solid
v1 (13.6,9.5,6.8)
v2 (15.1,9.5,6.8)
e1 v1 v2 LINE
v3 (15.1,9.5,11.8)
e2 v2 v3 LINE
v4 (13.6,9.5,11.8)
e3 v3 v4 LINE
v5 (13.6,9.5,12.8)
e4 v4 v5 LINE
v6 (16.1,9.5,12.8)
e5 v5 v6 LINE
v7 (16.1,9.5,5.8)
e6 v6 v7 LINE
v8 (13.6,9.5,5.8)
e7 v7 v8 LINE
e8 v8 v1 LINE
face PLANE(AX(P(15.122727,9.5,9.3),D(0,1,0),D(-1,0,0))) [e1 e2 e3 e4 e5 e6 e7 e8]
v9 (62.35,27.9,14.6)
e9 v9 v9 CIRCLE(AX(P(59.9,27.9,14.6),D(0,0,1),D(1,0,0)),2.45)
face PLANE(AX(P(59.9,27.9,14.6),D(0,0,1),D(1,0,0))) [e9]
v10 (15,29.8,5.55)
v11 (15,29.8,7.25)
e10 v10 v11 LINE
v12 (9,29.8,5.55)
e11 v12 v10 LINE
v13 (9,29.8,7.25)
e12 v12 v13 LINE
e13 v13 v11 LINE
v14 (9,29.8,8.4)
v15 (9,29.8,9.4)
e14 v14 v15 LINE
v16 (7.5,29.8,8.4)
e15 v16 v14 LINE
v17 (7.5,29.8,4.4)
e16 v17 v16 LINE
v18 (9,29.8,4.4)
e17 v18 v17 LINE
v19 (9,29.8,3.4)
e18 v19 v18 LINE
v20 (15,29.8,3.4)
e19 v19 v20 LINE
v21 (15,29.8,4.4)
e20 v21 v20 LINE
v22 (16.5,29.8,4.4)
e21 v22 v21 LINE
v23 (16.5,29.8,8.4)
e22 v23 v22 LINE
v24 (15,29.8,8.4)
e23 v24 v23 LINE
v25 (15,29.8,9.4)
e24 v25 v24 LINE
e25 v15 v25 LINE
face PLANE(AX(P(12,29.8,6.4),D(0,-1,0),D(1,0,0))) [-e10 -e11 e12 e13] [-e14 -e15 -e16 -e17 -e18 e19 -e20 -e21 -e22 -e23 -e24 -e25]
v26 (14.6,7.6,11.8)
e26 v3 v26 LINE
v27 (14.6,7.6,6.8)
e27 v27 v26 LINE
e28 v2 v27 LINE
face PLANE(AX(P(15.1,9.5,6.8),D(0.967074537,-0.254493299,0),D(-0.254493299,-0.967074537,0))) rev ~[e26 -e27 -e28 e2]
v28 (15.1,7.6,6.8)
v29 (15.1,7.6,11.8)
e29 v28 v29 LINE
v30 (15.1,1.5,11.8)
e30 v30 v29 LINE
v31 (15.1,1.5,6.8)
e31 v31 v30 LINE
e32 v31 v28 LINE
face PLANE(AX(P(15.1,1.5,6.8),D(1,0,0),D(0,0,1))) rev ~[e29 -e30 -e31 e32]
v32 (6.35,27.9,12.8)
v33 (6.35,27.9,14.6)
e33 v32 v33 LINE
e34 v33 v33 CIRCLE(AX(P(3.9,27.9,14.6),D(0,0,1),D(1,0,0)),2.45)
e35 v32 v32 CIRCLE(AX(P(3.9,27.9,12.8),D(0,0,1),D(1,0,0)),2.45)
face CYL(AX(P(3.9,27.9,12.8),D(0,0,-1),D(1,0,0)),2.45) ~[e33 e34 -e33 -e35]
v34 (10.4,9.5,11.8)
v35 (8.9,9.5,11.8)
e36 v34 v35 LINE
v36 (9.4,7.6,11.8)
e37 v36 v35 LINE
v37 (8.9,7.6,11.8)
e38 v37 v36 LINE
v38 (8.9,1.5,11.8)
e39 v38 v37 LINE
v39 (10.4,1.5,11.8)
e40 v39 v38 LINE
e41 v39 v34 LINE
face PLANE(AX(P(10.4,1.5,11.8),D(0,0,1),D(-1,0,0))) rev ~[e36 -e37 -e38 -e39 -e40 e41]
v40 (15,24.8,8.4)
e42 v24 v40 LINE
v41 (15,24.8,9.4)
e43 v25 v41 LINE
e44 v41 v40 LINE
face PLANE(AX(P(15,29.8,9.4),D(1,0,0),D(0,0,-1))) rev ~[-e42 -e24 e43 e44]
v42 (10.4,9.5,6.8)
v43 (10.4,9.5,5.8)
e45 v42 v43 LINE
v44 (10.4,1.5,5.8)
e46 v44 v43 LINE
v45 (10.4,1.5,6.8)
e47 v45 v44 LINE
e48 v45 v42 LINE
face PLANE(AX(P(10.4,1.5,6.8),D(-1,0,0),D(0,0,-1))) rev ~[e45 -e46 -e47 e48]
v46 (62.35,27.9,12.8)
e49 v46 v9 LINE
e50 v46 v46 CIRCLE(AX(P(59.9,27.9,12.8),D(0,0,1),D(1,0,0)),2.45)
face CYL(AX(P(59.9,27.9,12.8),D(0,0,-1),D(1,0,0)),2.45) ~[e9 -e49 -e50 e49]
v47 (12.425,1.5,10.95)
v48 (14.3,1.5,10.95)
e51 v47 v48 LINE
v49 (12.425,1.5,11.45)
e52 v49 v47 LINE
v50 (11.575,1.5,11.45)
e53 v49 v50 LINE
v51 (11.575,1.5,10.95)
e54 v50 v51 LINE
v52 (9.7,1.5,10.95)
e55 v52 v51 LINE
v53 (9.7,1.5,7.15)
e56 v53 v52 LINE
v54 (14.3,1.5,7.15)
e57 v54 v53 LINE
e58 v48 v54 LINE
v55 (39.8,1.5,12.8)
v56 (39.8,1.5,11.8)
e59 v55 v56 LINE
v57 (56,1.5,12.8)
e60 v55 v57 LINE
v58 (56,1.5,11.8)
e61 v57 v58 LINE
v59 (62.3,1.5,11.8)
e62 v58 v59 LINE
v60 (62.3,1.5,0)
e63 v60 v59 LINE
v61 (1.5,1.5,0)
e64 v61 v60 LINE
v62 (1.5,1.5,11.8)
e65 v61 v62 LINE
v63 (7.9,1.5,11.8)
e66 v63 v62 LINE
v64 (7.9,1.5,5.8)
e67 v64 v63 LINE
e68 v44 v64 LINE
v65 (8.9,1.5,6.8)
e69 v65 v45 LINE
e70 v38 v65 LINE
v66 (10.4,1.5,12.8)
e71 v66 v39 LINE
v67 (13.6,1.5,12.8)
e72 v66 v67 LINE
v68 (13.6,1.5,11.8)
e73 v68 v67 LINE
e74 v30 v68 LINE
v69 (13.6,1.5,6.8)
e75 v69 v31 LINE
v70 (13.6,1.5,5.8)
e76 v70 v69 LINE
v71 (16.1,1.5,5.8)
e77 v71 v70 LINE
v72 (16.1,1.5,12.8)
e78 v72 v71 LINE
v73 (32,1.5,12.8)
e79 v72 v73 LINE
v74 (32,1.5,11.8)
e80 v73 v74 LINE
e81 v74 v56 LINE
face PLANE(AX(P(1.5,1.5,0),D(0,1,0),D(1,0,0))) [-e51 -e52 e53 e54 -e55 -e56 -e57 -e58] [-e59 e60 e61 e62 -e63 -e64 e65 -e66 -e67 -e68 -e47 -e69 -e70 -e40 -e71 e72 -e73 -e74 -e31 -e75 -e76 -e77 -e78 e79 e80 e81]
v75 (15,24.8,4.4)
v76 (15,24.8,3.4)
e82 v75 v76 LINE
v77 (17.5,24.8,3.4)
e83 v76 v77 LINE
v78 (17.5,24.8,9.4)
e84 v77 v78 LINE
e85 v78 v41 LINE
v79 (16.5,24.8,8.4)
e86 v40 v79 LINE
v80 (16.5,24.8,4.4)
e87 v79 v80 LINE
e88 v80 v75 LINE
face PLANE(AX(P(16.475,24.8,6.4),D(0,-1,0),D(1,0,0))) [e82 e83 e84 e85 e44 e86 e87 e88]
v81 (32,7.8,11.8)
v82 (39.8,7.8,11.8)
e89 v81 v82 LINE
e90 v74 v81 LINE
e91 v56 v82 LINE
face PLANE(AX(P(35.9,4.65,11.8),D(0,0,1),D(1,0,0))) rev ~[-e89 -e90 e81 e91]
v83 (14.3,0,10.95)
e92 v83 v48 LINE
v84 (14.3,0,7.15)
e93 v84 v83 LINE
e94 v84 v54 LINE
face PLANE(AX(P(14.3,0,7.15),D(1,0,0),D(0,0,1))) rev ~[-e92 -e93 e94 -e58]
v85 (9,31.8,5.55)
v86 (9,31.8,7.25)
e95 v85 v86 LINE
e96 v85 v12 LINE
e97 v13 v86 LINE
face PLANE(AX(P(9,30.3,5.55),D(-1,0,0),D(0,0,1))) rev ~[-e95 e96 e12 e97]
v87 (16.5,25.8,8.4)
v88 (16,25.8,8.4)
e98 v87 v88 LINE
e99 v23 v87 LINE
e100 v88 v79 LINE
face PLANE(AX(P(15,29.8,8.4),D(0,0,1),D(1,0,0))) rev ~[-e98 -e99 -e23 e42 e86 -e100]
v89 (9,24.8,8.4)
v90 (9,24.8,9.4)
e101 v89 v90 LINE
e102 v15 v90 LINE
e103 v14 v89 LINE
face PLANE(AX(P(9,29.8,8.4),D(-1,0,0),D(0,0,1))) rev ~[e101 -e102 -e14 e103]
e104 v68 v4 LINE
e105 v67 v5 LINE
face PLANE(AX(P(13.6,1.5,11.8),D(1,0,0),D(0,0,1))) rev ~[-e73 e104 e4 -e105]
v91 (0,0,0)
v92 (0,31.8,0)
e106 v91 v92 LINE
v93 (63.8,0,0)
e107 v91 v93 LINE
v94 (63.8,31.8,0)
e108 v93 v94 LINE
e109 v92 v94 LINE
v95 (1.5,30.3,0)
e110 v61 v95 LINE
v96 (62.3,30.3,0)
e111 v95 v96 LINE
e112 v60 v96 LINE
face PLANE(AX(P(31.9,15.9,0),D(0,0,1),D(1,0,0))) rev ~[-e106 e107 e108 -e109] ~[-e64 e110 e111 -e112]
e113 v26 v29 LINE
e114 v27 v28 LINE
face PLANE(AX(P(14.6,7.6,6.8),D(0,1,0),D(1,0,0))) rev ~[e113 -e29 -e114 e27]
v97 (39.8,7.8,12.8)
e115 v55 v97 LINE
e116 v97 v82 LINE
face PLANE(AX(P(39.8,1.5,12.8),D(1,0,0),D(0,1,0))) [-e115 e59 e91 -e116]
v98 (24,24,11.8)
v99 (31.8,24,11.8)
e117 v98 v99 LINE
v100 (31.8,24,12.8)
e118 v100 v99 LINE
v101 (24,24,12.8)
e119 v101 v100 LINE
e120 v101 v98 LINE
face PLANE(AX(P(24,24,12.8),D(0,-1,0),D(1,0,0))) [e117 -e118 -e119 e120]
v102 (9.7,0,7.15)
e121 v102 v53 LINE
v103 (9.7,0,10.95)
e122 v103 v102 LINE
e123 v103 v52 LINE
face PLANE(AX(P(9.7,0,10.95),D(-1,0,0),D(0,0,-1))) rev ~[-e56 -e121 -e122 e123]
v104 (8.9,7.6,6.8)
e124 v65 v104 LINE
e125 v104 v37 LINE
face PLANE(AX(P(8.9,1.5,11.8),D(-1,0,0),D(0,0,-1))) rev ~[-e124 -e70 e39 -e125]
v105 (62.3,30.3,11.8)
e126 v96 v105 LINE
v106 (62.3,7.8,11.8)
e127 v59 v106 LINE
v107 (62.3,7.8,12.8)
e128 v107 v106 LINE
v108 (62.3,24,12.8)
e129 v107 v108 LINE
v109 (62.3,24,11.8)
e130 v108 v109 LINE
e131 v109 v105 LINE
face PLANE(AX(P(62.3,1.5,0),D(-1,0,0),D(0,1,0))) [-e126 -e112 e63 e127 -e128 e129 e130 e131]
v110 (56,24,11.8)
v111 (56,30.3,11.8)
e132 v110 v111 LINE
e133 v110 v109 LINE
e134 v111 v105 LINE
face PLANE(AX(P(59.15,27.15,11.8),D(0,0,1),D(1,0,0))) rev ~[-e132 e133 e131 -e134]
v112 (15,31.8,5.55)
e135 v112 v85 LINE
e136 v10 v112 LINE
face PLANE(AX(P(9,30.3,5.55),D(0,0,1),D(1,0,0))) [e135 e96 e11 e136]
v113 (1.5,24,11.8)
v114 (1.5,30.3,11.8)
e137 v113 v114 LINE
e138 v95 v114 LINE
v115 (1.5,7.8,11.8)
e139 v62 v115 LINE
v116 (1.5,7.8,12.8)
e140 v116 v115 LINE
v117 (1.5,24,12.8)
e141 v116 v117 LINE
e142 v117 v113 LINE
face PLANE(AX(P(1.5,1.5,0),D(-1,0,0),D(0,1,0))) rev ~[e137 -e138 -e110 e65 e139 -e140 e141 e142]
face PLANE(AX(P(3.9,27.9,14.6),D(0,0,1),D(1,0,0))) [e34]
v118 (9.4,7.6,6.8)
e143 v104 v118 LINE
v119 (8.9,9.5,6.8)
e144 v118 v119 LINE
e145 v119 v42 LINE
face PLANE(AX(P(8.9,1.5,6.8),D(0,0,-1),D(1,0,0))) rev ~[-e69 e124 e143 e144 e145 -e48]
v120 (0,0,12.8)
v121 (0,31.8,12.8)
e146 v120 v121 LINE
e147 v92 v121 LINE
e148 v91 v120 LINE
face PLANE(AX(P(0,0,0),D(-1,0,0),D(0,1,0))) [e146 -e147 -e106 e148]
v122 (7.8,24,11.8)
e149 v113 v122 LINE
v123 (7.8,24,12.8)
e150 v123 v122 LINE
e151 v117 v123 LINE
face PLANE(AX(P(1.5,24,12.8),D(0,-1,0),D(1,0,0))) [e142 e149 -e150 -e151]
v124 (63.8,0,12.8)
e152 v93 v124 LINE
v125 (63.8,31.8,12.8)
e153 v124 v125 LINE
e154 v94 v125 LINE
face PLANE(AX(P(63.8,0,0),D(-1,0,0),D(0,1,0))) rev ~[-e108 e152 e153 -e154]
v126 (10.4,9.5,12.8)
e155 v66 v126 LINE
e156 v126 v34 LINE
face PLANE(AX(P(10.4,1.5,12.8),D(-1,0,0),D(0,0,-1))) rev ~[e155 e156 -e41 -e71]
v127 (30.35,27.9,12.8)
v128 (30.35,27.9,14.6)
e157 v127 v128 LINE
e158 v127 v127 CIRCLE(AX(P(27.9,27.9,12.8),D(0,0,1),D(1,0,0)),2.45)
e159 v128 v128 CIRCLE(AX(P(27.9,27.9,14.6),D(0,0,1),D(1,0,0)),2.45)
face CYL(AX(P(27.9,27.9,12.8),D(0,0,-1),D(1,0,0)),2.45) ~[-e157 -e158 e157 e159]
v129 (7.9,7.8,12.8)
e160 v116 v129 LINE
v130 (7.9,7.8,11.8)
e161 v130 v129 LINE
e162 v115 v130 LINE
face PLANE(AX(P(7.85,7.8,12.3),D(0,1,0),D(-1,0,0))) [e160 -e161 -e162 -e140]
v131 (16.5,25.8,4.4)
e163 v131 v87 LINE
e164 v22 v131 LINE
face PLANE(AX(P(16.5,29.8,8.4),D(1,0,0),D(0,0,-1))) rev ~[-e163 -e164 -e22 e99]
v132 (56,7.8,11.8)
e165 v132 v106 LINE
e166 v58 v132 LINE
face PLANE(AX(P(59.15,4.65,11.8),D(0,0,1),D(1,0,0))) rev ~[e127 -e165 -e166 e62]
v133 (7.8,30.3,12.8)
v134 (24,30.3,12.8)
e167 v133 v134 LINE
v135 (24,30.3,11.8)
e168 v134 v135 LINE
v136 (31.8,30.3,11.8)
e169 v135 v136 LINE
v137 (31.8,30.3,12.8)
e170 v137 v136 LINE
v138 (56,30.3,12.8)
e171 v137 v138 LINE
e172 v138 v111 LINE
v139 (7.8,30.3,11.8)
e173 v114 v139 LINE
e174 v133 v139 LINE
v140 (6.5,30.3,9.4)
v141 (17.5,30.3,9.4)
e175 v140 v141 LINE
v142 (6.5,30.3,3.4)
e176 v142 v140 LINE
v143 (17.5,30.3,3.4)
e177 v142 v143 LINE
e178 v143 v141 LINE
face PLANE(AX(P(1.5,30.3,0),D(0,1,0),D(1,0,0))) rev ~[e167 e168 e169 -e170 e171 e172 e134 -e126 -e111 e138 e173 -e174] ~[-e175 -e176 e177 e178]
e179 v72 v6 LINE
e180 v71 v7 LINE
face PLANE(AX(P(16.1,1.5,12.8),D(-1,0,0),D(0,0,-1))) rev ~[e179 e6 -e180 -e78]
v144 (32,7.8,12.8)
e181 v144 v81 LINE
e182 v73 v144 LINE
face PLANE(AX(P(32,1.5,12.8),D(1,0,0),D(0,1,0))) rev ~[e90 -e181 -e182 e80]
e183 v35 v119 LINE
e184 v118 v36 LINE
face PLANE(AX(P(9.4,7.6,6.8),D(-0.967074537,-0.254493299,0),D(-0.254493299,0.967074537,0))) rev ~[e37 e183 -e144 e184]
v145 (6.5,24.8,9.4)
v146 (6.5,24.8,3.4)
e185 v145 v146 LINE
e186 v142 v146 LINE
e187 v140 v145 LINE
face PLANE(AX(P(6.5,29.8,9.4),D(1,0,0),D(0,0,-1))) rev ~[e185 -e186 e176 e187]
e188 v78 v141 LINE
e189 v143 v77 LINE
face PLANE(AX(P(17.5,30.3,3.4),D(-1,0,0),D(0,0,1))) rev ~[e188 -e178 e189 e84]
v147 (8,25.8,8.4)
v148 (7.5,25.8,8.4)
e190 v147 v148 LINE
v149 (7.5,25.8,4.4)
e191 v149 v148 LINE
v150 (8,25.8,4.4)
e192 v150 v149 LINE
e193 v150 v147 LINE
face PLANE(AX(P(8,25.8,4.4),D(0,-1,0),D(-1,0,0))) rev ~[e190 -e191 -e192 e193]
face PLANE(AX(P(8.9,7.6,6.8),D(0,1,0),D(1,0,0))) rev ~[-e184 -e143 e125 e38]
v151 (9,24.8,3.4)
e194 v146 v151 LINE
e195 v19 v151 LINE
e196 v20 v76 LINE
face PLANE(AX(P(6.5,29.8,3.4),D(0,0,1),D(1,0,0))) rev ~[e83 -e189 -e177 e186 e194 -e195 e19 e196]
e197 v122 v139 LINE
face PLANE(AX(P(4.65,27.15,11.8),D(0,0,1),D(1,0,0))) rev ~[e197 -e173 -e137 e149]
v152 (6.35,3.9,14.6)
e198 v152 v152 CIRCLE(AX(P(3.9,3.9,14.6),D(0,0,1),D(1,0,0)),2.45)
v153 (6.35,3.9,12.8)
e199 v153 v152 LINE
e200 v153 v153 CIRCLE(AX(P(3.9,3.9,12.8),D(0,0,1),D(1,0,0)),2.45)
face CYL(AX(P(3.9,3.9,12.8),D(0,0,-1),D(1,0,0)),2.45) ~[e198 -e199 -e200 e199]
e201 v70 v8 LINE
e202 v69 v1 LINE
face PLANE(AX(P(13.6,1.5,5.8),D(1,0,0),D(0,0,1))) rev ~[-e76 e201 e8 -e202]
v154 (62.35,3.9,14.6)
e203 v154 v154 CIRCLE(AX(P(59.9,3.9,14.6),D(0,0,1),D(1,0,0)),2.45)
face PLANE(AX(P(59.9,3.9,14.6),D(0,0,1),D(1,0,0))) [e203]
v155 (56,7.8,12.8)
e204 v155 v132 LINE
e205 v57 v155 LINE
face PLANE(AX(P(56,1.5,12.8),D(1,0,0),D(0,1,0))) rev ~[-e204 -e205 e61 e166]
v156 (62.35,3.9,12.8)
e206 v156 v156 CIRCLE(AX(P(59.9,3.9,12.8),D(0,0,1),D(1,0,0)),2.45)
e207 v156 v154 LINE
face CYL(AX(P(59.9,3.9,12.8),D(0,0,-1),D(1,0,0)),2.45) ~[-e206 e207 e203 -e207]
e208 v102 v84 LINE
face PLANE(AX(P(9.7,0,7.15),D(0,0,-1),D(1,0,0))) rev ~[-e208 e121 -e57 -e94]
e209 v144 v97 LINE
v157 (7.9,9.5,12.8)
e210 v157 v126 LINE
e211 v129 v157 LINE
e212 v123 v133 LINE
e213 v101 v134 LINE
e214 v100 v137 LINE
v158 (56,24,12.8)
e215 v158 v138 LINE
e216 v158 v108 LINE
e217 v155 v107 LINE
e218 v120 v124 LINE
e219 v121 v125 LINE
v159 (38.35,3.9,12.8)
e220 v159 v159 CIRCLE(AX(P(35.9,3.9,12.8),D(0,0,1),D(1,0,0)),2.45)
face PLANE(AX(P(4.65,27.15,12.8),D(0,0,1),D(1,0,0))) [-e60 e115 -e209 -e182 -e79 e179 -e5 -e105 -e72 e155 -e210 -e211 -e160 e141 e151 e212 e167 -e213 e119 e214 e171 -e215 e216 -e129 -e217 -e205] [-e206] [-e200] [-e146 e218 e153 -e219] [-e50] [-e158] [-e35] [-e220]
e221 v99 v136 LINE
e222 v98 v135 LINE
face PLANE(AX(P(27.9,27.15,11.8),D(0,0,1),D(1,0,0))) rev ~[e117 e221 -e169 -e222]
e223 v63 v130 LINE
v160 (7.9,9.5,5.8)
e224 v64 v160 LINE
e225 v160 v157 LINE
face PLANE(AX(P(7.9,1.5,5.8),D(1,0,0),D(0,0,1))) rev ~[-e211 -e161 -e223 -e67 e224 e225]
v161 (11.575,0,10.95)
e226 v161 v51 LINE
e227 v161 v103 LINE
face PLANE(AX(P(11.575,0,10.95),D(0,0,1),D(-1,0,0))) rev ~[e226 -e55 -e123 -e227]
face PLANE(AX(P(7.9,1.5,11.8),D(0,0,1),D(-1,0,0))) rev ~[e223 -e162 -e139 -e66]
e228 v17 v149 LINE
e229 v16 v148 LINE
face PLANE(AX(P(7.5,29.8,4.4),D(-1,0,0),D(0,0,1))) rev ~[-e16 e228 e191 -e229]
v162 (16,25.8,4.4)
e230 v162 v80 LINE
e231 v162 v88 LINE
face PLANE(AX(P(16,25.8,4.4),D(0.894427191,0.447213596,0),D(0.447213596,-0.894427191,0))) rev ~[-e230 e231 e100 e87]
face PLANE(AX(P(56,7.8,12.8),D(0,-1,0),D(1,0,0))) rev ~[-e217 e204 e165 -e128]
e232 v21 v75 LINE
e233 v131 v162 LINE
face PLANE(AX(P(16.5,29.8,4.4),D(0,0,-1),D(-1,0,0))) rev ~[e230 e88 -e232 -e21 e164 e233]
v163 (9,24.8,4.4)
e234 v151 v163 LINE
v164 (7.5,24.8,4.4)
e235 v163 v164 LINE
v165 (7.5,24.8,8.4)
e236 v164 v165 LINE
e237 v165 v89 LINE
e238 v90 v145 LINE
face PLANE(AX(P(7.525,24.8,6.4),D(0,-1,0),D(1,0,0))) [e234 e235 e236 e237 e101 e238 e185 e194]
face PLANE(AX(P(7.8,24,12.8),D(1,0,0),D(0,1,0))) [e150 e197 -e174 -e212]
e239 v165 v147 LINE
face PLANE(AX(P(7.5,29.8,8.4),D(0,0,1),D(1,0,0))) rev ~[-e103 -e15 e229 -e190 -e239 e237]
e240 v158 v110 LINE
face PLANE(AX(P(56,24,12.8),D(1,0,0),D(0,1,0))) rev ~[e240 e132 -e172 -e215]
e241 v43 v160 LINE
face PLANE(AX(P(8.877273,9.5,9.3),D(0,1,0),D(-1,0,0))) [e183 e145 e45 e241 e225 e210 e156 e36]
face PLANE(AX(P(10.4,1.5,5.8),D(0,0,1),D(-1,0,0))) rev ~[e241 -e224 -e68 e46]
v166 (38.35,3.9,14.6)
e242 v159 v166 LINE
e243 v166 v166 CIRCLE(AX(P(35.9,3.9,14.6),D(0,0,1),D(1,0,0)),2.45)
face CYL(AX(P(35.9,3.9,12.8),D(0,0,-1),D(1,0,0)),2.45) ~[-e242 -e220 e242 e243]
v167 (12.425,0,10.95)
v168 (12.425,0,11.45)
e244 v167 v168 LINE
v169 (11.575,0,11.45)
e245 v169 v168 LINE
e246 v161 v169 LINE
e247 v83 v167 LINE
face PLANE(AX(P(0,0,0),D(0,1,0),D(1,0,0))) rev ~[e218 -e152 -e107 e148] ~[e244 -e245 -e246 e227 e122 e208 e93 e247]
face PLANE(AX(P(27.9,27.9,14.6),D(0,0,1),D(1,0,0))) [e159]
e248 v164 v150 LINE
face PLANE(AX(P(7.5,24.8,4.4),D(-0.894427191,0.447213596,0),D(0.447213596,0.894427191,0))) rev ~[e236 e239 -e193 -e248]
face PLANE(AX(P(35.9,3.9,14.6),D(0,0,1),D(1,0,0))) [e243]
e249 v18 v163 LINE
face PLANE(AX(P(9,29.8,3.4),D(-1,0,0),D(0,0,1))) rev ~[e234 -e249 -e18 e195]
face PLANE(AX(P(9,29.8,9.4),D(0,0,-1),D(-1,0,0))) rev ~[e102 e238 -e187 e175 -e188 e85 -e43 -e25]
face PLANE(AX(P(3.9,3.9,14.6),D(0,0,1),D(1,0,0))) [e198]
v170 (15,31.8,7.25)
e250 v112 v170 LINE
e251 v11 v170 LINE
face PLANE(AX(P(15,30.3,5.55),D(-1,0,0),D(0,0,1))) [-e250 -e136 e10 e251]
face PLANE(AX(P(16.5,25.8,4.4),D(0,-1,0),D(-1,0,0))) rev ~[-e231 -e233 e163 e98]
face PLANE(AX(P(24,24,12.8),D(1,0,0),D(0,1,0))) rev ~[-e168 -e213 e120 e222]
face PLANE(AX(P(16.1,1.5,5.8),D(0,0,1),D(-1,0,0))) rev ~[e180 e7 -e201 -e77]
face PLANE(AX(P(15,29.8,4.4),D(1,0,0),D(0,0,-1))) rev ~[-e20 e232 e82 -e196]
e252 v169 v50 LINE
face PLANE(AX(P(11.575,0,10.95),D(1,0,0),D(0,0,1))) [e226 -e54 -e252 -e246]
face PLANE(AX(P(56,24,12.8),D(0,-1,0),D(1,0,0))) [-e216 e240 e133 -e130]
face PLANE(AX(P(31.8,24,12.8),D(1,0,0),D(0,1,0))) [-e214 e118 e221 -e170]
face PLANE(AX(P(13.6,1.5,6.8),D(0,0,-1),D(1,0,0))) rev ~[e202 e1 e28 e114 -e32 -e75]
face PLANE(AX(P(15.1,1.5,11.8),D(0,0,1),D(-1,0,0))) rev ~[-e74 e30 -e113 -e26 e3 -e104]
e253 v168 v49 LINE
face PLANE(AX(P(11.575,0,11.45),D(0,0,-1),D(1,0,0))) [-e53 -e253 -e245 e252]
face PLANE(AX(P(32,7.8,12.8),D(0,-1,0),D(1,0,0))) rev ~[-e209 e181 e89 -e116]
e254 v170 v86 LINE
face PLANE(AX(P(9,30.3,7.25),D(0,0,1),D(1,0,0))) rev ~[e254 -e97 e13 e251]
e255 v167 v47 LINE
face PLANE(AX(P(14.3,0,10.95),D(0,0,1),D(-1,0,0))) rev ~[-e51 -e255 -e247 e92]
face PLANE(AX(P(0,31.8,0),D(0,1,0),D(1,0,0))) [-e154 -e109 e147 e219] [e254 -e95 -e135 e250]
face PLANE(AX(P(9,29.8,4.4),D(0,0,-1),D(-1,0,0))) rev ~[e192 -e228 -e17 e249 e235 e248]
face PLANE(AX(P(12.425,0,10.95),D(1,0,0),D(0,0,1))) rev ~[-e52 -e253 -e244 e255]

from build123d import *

# Parameters (mm, degrees)
F0_W      = 63.8
F0_H      = 31.8
F0_W_2    = 60.8
F0_H_2    = 28.8
F1_DEPTH  = 12.8
F2_W      = 6.3
F2_H      = 6.3
F2_W_2    = 7.8
F3_DEPTH  = 1
F4_R      = 2.45
F5_DEPTH  = 1.8
F6_W      = 0.85
F6_H      = 0.5
F7_DEPTH  = 25.4
F9_DEPTH  = 8
F11_DEPTH = 5
F12_W     = 0.1
F12_H     = 1
F13_DEPTH = 6.3
F14_W     = 6
F14_H     = 1.7
F15_DEPTH = 2.54
F16_W     = 11
F16_H     = 6
F16_W_2   = 6
F16_H_2   = 1.7
F17_DEPTH = 0.5
F19_DEPTH = 5
F21_DEPTH = 4


# Not quite as in the source:
# - a feature names something its author has since deleted; it is built from what else it names


with BuildPart() as f1:
    # F0 (on Top) → F1 (new body)
    with BuildSketch(Plane.XY):
        with Locations((31.9, 15.9)):
            Rectangle(F0_W, F0_H)
        with Locations((31.9, 15.9)):
            Rectangle(F0_W_2, F0_H_2, mode=Mode.SUBTRACT)
    extrude(amount=F1_DEPTH)

    # F2 (on face) → F3 (join)
    with BuildSketch(Plane.XY.offset(12.8)):
        with Locations((4.65, 27.15)):
            Rectangle(F2_W, F2_H)
        with Locations((4.65, 4.65)):
            Rectangle(F2_W, F2_H)
        with Locations((59.15, 4.65)):
            Rectangle(F2_W, F2_H)
        with Locations((59.15, 27.15)):
            Rectangle(F2_W, F2_H)
        with Locations((27.9, 27.15)):
            Rectangle(F2_W_2, F2_H)
        with Locations((35.9, 4.65)):
            Rectangle(F2_W_2, F2_H)
    extrude(amount=-F3_DEPTH)

    # F4 (on face) → F5 (join)
    with BuildSketch(Plane.XY.offset(12.8)):
        with Locations((3.9, 27.9)):
            Circle(F4_R)
        with Locations((59.9, 27.9)):
            Circle(F4_R)
        with Locations((59.9, 3.9)):
            Circle(F4_R)
        with Locations((3.9, 3.9)):
            Circle(F4_R)
        with Locations((27.9, 27.9)):
            Circle(F4_R)
        with Locations((35.9, 3.9)):
            Circle(F4_R)
    extrude(amount=F5_DEPTH)

    # F6 (on face) → F7 (cut)
    with BuildSketch(Plane.XZ):
        Polygon((11.575, 10.95), (9.7, 10.95), (9.7, 7.15), (14.3, 7.15), (14.3, 10.95), (12.425, 10.95), align=None)
        with Locations((12, 11.2)):
            Rectangle(F6_W, F6_H)
    extrude(amount=-F7_DEPTH, mode=Mode.SUBTRACT)

    # F8 (on face) → F9 (join)
    with BuildSketch(Plane(origin=(0, 1.5, 0), x_dir=(-1, 0, 0), z_dir=(0, 1, 0))):
        Polygon((-13.6, 5.8), (-13.6, 6.8), (-15.1, 6.8), (-15.1, 11.8), (-13.6, 11.8), (-13.6, 12.8), (-16.1, 12.8), (-16.1, 5.8), align=None)
        Polygon((-8.9, 6.8), (-10.4, 6.8), (-10.4, 5.8), (-7.9, 5.8), (-7.9, 12.8), (-10.4, 12.8), (-10.4, 11.8), (-8.9, 11.8), align=None)
    extrude(amount=F9_DEPTH)

    # F10 (on face) → F11 (join, through all)
    with BuildSketch(Plane.XY.offset(6.8)):
        Polygon((14.6, 7.6), (15.1, 7.6), (15.1, 9.5), align=None)
        Polygon((9.4, 7.6), (8.9, 9.5), (8.9, 7.6), align=None)
    extrude(amount=F11_DEPTH)

    # F12 (on face) → F13 (join, through all)
    with BuildSketch(Plane(origin=(0, 1.5, 0), x_dir=(-1, 0, 0), z_dir=(0, 1, 0))):
        with Locations((-7.85, 12.3)):
            Rectangle(F12_W, F12_H)
    extrude(amount=F13_DEPTH)

    # F14 (on face) → F15 (cut)
    with BuildSketch(Plane(origin=(0, 31.8, 0), x_dir=(-1, 0, 0), z_dir=(0, 1, 0))):
        with Locations((-12, 6.4)):
            Rectangle(F14_W, F14_H)
    extrude(amount=-F15_DEPTH, mode=Mode.SUBTRACT)

    # F16 (on face) → F17 (join)
    with BuildSketch(Plane.XZ.offset(-30.3)):
        with Locations((12, 6.4)):
            Rectangle(F16_W, F16_H)
        with Locations((12, 6.4)):
            Rectangle(F16_W_2, F16_H_2, mode=Mode.SUBTRACT)
    extrude(amount=F17_DEPTH)

    # F18 (on face) → F19 (join)
    with BuildSketch(Plane.XZ.offset(-29.8)):
        Polygon((9, 9.4), (6.5, 9.4), (6.5, 3.4), (9, 3.4), (9, 4.4), (7.5, 4.4), (7.5, 8.4), (9, 8.4), align=None)
        Polygon((17.5, 9.4), (15, 9.4), (15, 8.4), (16.5, 8.4), (16.5, 4.4), (15, 4.4), (15, 3.4), (17.5, 3.4), align=None)
    extrude(amount=F19_DEPTH)

    # F20 (on face) → F21 (join, through all)
    with BuildSketch(Plane.XY.offset(4.4)):
        Polygon((7.5, 25.8), (7.5, 24.8), (8, 25.8), align=None)
        Polygon((16, 25.8), (16.5, 24.8), (16.5, 25.8), align=None)
    extrude(amount=F21_DEPTH)


solid = f1.part
